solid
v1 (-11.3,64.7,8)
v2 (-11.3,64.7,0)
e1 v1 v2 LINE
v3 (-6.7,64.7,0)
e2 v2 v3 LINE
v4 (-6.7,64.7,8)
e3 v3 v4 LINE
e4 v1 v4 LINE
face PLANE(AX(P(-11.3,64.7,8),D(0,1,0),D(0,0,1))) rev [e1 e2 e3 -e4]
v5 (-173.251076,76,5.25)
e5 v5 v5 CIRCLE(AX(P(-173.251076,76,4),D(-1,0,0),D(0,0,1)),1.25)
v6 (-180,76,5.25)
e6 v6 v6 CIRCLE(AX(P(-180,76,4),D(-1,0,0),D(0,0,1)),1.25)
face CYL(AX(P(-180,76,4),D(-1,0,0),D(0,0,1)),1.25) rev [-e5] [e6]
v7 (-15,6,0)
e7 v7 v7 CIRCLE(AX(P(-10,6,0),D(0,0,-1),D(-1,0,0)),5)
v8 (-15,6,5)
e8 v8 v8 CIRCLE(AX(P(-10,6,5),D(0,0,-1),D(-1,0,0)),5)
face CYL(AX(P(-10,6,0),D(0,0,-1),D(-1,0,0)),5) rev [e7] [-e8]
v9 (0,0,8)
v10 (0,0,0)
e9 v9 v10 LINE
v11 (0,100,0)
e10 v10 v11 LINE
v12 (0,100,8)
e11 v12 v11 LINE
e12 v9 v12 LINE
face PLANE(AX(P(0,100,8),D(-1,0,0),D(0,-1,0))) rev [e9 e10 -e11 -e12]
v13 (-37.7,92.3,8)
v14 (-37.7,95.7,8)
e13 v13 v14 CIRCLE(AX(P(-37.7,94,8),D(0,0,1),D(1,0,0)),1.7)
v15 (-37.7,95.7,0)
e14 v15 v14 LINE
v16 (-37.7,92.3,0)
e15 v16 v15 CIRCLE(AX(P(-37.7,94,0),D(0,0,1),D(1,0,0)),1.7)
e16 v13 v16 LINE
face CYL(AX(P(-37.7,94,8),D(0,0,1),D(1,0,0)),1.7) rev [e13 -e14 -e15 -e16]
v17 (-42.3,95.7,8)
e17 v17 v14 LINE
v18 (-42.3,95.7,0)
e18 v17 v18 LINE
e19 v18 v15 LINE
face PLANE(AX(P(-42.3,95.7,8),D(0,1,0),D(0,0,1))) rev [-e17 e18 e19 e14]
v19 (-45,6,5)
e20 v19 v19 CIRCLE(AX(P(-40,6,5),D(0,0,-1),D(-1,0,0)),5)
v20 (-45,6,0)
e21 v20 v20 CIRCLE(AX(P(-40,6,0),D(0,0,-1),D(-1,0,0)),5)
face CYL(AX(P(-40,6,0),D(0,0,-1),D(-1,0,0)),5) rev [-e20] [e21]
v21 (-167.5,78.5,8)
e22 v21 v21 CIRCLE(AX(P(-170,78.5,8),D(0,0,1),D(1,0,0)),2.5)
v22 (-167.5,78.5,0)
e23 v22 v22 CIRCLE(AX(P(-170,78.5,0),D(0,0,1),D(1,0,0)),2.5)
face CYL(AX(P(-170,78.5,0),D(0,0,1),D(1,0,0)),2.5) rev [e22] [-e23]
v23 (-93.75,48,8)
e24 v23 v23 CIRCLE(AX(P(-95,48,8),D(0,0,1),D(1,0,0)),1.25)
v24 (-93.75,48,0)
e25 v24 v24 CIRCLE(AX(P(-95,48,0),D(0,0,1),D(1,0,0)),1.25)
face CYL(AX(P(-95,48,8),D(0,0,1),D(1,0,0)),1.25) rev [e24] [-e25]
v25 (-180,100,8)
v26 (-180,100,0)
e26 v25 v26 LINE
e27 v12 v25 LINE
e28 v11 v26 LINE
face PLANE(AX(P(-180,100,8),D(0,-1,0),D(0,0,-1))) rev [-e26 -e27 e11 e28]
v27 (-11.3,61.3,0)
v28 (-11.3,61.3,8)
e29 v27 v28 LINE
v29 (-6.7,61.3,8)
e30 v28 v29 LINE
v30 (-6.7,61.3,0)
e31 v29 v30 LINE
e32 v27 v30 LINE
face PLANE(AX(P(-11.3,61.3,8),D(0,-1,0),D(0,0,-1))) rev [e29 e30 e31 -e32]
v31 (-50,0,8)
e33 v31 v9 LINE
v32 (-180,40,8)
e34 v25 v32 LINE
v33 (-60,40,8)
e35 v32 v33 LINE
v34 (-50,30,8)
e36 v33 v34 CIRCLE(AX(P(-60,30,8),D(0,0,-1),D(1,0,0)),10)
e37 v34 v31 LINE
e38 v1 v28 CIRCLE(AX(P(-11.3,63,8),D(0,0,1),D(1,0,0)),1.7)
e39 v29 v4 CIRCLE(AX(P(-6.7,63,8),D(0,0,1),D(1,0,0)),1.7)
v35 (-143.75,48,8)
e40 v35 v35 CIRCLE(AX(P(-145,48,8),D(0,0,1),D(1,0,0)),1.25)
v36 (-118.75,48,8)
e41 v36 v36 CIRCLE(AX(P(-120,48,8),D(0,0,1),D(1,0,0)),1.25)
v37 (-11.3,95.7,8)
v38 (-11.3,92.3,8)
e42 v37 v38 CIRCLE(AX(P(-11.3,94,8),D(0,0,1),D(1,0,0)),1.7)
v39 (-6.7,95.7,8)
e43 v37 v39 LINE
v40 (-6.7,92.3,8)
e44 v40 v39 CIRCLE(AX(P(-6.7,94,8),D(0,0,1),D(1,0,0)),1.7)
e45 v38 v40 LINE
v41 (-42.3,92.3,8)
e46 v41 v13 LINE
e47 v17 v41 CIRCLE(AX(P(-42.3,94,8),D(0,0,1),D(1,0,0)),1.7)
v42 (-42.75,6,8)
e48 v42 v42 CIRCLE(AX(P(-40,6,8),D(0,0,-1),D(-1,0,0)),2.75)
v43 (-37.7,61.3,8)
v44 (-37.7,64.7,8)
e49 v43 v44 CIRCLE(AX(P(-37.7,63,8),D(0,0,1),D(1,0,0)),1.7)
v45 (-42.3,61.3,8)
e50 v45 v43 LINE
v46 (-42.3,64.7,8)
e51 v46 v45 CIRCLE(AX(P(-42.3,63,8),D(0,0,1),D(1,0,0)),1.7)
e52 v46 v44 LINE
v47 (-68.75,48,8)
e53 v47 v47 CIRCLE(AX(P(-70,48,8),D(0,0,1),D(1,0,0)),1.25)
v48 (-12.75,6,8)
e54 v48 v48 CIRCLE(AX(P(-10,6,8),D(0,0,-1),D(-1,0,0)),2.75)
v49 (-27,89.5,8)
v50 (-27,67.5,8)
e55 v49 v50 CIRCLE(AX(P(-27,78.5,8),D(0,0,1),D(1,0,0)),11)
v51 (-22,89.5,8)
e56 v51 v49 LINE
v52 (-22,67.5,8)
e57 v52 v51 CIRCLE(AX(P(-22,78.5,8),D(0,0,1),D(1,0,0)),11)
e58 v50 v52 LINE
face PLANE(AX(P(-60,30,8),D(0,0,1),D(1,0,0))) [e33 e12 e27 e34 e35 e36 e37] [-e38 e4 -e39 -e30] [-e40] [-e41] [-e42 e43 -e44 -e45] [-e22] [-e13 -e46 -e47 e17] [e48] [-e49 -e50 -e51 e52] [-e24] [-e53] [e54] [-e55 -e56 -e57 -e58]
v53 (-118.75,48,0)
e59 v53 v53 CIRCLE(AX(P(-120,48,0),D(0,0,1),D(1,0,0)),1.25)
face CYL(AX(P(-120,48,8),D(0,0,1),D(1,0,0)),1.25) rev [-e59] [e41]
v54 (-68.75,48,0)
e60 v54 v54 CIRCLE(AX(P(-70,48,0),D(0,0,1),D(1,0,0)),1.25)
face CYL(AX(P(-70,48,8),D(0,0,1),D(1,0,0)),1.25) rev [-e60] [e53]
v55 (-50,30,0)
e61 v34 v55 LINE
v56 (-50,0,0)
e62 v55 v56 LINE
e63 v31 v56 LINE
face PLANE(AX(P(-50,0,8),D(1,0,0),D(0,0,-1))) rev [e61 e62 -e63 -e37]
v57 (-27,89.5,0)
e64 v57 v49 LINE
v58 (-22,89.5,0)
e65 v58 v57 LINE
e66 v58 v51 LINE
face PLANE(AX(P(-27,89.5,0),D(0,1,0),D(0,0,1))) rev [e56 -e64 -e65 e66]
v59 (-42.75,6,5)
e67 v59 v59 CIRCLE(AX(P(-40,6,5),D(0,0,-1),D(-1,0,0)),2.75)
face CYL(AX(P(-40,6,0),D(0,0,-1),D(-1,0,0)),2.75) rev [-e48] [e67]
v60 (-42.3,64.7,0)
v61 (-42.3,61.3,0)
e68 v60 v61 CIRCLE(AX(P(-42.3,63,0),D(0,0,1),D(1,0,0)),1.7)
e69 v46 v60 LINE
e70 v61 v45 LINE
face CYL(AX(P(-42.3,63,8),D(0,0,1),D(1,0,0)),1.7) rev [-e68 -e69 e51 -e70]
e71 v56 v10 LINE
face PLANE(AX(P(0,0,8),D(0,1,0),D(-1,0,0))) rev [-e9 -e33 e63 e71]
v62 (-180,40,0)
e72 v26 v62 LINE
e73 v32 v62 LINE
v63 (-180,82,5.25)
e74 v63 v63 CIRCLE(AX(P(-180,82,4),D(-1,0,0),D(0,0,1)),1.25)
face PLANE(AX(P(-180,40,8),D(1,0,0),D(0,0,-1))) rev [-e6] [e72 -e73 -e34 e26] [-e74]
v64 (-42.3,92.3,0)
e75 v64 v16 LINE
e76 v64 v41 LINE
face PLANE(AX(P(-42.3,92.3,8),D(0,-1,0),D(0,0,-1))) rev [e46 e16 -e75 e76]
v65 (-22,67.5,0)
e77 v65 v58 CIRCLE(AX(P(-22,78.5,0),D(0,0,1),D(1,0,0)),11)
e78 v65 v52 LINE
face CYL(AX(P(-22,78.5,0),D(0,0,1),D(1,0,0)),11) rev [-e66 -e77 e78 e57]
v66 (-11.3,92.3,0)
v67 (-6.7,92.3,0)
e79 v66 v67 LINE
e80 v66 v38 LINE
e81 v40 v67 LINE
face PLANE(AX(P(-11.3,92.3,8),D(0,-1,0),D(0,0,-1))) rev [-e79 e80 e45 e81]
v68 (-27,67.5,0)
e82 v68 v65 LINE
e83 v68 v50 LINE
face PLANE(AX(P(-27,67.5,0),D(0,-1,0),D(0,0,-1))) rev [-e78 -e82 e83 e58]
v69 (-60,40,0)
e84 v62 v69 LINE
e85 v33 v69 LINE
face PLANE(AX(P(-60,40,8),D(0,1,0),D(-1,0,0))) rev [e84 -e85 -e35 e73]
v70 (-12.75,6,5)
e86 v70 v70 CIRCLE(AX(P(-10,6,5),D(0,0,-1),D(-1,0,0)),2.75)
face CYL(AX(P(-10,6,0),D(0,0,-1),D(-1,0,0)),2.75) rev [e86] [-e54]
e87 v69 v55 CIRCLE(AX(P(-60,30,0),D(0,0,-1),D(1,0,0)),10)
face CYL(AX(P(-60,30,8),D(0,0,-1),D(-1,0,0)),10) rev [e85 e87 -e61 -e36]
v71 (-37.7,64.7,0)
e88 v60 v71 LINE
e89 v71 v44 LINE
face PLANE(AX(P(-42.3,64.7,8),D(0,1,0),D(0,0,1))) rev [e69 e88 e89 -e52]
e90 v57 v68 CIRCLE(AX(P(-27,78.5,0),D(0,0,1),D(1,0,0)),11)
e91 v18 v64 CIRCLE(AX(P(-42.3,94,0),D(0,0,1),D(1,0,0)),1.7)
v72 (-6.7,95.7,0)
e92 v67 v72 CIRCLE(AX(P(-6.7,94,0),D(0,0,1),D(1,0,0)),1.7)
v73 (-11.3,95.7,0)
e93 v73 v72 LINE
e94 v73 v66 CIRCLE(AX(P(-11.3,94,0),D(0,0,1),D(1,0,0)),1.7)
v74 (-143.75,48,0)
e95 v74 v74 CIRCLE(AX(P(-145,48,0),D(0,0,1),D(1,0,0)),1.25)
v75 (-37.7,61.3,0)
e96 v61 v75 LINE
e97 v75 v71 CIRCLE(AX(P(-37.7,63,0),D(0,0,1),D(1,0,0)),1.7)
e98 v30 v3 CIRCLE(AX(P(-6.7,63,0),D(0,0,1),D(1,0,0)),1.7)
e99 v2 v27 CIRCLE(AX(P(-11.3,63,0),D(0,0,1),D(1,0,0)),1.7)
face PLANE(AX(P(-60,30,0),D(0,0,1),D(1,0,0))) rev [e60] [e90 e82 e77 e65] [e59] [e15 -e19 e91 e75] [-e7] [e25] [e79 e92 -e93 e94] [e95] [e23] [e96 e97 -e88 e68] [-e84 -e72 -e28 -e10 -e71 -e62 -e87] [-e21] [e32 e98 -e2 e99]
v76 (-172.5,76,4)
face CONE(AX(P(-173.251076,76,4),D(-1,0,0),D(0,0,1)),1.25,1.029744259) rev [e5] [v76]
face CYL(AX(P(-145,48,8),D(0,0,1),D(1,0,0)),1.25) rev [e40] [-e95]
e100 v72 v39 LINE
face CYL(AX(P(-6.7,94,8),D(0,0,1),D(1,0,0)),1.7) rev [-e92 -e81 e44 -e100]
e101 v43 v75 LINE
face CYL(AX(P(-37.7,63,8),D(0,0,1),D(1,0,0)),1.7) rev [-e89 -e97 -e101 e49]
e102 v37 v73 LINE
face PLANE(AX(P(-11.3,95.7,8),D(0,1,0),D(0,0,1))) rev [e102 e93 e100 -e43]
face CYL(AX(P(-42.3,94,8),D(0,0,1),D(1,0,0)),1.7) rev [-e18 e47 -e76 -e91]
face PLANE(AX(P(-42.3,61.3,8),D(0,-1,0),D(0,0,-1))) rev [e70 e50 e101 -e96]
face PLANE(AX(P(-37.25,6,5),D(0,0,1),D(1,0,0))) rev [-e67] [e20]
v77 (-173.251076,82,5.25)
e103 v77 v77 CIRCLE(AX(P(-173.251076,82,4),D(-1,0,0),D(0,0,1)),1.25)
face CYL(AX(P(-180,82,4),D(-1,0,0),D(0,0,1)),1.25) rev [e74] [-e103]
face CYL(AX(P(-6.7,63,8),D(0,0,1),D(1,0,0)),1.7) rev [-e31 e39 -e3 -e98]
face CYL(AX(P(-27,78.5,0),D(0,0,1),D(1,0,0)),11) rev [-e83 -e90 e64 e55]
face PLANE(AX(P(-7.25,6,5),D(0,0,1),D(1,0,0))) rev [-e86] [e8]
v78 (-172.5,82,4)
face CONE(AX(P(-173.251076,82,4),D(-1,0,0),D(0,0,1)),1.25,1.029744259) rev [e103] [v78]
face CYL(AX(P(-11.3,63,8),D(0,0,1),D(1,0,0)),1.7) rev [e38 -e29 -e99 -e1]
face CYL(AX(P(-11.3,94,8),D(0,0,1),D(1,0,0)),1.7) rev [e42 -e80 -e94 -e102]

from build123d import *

# Parameters (mm, degrees)
BODY_DEPTH                     = 8
M3_CLEARANCE_SLOT1_DEPTH       = 8
LPATTERN3_COUNT                = 2
LPATTERN3_PITCH                = 31
LPATTERN3_COUNT_DIR2           = 2
LPATTERN3_PITCH_DIR2           = 31
CUT_EXTRUDE1_DEPTH             = 207.067949958
M3X0_5_TAPPED_HOLE1_D          = 2.5
LPATTERN2_COUNT                = 4
LPATTERN2_PITCH                = 25
CBORE_FOR_M5_SHCS1_D           = 5.5
CBORE_FOR_M5_SHCS1_CBORE_D     = 10
CBORE_FOR_M5_SHCS1_CBORE_DEPTH = 5
M3X0_5_TAPPED_HOLE2_D          = 2.5
M3X0_5_TAPPED_HOLE2_DEPTH      = 6.748924226
M3X0_5_TAPPED_HOLE2_TIP        = 0.751075774
SKETCH22_R                     = 2.5
CUT_EXTRUDE2_DEPTH             = 207.067949958


# Read off the part's stored shape, not the designer's step: M3 Clearance Slot1
with BuildPart() as part:
    # Sketch1 → BODY (new body)
    with BuildSketch(Plane.XY):
        with BuildLine():
            Line((-180, 100), (0, 100))
            Line((0, 100), (0, 0))
            Line((0, 0), (-50, 0))
            Line((-50, 0), (-50, 30))
            ThreePointArc((-50, 30), (-52.928932188, 37.071067812), (-60, 40))
            Line((-60, 40), (-180, 40))
            Line((-180, 40), (-180, 100))
        make_face()
    extrude(amount=BODY_DEPTH)

    # M3 Clearance Slot1 outline → M3 Clearance Slot1 (cut)
    with BuildSketch(Plane.XY):
        with BuildLine():
            Line((-42.3, 92.3), (-37.7, 92.3))
            ThreePointArc((-37.7, 92.3), (-36, 94), (-37.7, 95.7))
            Line((-37.7, 95.7), (-42.3, 95.7))
            ThreePointArc((-42.3, 95.7), (-44, 94), (-42.3, 92.3))
        make_face()
    m3_clearance_slot1 = extrude(amount=M3_CLEARANCE_SLOT1_DEPTH, mode=Mode.SUBTRACT)

    # LPattern3: M3 Clearance Slot1 2 × 2
    with Locations(*[(i * LPATTERN3_PITCH, -j * LPATTERN3_PITCH_DIR2, 0) for i in range(LPATTERN3_COUNT) for j in range(LPATTERN3_COUNT_DIR2) if (i, j) != (0, 0)]):
        add(m3_clearance_slot1, mode=Mode.SUBTRACT)

    # Sketch21 → Cut-Extrude1 (cut, through all)
    with BuildSketch(Plane.XY.offset(8)):
        with BuildLine():
            Line((-27, 89.5), (-22, 89.5))
            ThreePointArc((-22, 89.5), (-11, 78.5), (-22, 67.5))
            Line((-22, 67.5), (-27, 67.5))
            ThreePointArc((-27, 67.5), (-38, 78.5), (-27, 89.5))
        make_face()
    extrude(amount=-CUT_EXTRUDE1_DEPTH, mode=Mode.SUBTRACT)

    # M3x0.5 Tapped Hole1 (through all)
    with Locations(Plane.XY.offset(8)):
        with Locations((-70, 48)):
            m3x0_5_tapped_hole1 = Hole(M3X0_5_TAPPED_HOLE1_D / 2)

    # LPattern2: M3x0.5 Tapped Hole1 ×4
    with Locations(*[(-i * LPATTERN2_PITCH, 0, 0) for i in range(1, LPATTERN2_COUNT)]):
        add(m3x0_5_tapped_hole1, mode=Mode.SUBTRACT)

    # CBORE for M5 SHCS1 (through all)
    with Locations(Plane(origin=(0, 0, 0), x_dir=(-1, 0, 0), z_dir=(0, 0, -1))):
        with Locations((10, 6), (40, 6)):
            CounterBoreHole(CBORE_FOR_M5_SHCS1_D / 2, CBORE_FOR_M5_SHCS1_CBORE_D / 2, CBORE_FOR_M5_SHCS1_CBORE_DEPTH)

    # M3x0.5 Tapped Hole2
    with Locations(Plane.ZY.offset(180)):
        with Locations((4, 82), (4, 76)):
            Hole(M3X0_5_TAPPED_HOLE2_D / 2, depth=M3X0_5_TAPPED_HOLE2_DEPTH)
            with Locations((0, 0, -(M3X0_5_TAPPED_HOLE2_DEPTH + M3X0_5_TAPPED_HOLE2_TIP / 2))):  # 118° drill point
                Cone(0, M3X0_5_TAPPED_HOLE2_D / 2, M3X0_5_TAPPED_HOLE2_TIP, mode=Mode.SUBTRACT)

    # Sketch22 → Cut-Extrude2 (cut, through all)
    with BuildSketch(Plane.XY.offset(8)):
        with Locations((-170, 78.5)):
            Circle(SKETCH22_R)
    extrude(amount=-CUT_EXTRUDE2_DEPTH, mode=Mode.SUBTRACT)


solid = part.part
